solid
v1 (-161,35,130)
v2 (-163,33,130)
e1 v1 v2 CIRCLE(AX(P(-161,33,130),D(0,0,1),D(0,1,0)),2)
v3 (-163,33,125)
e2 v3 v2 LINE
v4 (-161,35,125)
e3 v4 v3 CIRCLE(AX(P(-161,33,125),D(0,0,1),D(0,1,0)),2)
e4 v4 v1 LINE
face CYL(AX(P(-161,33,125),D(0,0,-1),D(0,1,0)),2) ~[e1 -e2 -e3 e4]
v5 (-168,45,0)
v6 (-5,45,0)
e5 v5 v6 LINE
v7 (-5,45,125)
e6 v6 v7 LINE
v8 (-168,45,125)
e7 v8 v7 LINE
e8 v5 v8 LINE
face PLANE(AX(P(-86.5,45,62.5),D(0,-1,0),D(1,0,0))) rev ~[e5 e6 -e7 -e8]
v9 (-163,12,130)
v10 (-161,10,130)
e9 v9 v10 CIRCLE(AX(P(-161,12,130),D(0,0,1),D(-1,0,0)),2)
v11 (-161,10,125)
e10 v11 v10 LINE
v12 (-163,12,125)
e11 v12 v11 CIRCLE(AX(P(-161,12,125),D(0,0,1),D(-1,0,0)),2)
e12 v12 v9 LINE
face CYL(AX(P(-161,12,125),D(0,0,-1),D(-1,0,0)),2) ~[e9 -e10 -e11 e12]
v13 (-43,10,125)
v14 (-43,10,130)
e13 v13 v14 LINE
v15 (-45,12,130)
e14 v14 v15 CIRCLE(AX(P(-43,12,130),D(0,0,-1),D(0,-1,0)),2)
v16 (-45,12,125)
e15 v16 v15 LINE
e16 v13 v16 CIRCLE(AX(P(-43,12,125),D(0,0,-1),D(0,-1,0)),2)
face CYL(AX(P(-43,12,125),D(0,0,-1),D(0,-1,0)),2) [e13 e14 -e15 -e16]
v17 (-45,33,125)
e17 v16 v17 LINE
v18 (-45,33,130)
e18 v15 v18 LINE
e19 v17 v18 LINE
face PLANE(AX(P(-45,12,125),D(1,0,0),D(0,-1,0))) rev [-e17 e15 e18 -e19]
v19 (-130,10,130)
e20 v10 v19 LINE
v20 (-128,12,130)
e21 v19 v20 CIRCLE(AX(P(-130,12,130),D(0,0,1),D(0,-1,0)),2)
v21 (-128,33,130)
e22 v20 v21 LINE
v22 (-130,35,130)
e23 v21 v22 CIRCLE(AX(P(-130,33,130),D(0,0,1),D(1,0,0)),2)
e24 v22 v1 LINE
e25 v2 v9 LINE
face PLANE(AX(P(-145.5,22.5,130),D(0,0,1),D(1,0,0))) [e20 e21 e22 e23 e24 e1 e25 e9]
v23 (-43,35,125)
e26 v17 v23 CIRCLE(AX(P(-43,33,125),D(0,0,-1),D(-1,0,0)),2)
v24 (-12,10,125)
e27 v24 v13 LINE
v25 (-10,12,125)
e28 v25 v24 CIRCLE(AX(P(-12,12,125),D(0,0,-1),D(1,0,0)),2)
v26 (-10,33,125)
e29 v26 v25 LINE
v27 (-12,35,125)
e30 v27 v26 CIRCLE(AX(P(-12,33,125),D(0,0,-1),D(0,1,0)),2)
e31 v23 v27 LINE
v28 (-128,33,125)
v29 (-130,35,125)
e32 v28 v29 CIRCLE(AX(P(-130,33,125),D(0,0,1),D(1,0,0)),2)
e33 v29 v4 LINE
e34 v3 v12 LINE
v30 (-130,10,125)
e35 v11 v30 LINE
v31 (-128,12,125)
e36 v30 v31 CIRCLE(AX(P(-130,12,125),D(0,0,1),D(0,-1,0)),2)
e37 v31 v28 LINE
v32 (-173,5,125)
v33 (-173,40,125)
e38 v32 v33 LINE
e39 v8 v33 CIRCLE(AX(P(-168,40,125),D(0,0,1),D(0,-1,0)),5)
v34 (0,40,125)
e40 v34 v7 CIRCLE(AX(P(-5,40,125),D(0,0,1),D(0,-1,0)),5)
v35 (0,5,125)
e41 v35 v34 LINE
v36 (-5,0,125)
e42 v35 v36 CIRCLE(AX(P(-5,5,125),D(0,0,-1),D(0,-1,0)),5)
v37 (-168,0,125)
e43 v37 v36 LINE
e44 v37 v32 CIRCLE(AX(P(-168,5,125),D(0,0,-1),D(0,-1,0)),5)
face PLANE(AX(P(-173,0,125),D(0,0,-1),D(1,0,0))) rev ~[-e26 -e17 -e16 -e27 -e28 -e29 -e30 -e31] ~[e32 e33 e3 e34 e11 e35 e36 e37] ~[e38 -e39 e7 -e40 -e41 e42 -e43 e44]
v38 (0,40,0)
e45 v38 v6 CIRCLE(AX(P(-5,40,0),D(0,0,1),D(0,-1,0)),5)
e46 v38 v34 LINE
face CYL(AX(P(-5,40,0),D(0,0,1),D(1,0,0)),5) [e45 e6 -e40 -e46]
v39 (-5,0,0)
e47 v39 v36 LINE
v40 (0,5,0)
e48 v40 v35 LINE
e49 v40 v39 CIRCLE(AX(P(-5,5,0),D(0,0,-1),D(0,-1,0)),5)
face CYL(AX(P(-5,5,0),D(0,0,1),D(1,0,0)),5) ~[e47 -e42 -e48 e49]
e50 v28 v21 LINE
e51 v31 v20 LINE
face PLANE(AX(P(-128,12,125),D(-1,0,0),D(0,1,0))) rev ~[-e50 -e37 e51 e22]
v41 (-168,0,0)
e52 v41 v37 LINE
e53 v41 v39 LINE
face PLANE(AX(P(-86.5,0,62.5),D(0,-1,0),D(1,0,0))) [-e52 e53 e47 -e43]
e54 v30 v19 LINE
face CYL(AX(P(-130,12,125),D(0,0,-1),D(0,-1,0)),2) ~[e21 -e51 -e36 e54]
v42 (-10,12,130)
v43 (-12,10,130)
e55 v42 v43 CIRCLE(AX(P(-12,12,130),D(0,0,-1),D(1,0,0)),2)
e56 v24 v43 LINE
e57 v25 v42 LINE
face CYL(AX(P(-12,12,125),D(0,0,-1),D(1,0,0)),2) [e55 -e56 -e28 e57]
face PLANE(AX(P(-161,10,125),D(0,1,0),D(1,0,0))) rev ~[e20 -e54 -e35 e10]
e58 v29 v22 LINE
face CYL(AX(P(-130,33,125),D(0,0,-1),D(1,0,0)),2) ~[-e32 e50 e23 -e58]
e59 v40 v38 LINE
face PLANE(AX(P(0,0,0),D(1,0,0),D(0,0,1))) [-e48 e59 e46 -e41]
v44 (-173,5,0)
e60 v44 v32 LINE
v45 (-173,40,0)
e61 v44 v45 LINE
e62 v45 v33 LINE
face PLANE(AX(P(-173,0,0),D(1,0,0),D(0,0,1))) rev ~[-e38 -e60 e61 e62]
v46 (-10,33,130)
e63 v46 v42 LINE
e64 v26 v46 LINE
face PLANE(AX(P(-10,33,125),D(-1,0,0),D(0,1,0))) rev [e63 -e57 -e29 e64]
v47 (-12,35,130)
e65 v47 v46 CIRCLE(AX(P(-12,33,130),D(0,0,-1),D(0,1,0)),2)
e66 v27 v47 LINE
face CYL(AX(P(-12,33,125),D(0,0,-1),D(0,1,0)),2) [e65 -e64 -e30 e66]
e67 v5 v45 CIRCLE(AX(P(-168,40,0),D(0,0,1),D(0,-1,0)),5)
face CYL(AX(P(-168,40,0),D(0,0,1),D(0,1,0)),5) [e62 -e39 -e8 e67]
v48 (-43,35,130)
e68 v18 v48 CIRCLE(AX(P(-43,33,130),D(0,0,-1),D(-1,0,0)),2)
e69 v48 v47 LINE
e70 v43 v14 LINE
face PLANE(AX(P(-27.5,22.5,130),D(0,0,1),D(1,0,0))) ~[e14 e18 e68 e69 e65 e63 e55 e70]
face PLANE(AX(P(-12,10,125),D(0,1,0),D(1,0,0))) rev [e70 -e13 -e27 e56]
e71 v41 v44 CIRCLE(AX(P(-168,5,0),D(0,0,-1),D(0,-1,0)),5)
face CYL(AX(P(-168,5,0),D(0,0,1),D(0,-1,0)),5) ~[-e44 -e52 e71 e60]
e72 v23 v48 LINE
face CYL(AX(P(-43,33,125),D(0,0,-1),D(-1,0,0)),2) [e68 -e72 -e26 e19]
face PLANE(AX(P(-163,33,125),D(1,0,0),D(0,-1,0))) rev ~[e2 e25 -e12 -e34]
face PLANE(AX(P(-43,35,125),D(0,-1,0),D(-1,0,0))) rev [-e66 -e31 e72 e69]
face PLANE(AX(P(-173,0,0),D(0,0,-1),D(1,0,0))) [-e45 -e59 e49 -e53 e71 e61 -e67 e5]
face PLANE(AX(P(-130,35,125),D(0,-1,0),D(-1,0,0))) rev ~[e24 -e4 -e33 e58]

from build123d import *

# Parameters (mm, degrees)
F0_W     = 173
F0_H     = 125
F1_DEPTH = 45
F2_R     = 5
F3_R     = 5
F5_DEPTH = 5


# Not quite as in the source:
# - a pattern or mirror of a feature is missing from the dataset's text; its kind, count and spacing are read off the source's solid


with BuildPart() as f1:
    # F0 (on Front) → F1 (new body)
    with BuildSketch(Plane.XZ):
        with Locations((-86.5, 62.5)):
            Rectangle(F0_W, F0_H)
    extrude(amount=-F1_DEPTH)

    # F2
    f2_edges = [f1.edges().sort_by_distance(p)[0] for p in [
        (0, 0, 62.5),
    ]]
    fillet(f2_edges, radius=F2_R)

    # F3
    f3_edges = [f1.edges().sort_by_distance(p)[0] for p in [
        (0, 45, 62.5),
        (-173, 45, 62.5),
        (-173, 0, 62.5),
    ]]
    fillet(f3_edges, radius=F3_R)

    # F4 (on face) → F5 (join)
    with BuildSketch(Plane.XY.offset(125)):
        with BuildLine():
            Line((-130, 35), (-161, 35))
            ThreePointArc((-161, 35), (-162.4142135624, 34.4142135624), (-163, 33))
            Line((-163, 33), (-163, 12))
            ThreePointArc((-163, 12), (-162.4142135624, 10.5857864376), (-161, 10))
            Line((-161, 10), (-130, 10))
            ThreePointArc((-130, 10), (-128.5857864376, 10.5857864376), (-128, 12))
            Line((-128, 12), (-128, 33))
            ThreePointArc((-128, 33), (-128.5857864376, 34.4142135624), (-130, 35))
        make_face()
    f5 = extrude(amount=F5_DEPTH)

    # F5_copies: F5 across plane
    add(f5.mirror(Plane(origin=(-86.5, 0, 0), x_dir=(0, 0, 1), z_dir=(1, 0, 0))))


solid = f1.part
